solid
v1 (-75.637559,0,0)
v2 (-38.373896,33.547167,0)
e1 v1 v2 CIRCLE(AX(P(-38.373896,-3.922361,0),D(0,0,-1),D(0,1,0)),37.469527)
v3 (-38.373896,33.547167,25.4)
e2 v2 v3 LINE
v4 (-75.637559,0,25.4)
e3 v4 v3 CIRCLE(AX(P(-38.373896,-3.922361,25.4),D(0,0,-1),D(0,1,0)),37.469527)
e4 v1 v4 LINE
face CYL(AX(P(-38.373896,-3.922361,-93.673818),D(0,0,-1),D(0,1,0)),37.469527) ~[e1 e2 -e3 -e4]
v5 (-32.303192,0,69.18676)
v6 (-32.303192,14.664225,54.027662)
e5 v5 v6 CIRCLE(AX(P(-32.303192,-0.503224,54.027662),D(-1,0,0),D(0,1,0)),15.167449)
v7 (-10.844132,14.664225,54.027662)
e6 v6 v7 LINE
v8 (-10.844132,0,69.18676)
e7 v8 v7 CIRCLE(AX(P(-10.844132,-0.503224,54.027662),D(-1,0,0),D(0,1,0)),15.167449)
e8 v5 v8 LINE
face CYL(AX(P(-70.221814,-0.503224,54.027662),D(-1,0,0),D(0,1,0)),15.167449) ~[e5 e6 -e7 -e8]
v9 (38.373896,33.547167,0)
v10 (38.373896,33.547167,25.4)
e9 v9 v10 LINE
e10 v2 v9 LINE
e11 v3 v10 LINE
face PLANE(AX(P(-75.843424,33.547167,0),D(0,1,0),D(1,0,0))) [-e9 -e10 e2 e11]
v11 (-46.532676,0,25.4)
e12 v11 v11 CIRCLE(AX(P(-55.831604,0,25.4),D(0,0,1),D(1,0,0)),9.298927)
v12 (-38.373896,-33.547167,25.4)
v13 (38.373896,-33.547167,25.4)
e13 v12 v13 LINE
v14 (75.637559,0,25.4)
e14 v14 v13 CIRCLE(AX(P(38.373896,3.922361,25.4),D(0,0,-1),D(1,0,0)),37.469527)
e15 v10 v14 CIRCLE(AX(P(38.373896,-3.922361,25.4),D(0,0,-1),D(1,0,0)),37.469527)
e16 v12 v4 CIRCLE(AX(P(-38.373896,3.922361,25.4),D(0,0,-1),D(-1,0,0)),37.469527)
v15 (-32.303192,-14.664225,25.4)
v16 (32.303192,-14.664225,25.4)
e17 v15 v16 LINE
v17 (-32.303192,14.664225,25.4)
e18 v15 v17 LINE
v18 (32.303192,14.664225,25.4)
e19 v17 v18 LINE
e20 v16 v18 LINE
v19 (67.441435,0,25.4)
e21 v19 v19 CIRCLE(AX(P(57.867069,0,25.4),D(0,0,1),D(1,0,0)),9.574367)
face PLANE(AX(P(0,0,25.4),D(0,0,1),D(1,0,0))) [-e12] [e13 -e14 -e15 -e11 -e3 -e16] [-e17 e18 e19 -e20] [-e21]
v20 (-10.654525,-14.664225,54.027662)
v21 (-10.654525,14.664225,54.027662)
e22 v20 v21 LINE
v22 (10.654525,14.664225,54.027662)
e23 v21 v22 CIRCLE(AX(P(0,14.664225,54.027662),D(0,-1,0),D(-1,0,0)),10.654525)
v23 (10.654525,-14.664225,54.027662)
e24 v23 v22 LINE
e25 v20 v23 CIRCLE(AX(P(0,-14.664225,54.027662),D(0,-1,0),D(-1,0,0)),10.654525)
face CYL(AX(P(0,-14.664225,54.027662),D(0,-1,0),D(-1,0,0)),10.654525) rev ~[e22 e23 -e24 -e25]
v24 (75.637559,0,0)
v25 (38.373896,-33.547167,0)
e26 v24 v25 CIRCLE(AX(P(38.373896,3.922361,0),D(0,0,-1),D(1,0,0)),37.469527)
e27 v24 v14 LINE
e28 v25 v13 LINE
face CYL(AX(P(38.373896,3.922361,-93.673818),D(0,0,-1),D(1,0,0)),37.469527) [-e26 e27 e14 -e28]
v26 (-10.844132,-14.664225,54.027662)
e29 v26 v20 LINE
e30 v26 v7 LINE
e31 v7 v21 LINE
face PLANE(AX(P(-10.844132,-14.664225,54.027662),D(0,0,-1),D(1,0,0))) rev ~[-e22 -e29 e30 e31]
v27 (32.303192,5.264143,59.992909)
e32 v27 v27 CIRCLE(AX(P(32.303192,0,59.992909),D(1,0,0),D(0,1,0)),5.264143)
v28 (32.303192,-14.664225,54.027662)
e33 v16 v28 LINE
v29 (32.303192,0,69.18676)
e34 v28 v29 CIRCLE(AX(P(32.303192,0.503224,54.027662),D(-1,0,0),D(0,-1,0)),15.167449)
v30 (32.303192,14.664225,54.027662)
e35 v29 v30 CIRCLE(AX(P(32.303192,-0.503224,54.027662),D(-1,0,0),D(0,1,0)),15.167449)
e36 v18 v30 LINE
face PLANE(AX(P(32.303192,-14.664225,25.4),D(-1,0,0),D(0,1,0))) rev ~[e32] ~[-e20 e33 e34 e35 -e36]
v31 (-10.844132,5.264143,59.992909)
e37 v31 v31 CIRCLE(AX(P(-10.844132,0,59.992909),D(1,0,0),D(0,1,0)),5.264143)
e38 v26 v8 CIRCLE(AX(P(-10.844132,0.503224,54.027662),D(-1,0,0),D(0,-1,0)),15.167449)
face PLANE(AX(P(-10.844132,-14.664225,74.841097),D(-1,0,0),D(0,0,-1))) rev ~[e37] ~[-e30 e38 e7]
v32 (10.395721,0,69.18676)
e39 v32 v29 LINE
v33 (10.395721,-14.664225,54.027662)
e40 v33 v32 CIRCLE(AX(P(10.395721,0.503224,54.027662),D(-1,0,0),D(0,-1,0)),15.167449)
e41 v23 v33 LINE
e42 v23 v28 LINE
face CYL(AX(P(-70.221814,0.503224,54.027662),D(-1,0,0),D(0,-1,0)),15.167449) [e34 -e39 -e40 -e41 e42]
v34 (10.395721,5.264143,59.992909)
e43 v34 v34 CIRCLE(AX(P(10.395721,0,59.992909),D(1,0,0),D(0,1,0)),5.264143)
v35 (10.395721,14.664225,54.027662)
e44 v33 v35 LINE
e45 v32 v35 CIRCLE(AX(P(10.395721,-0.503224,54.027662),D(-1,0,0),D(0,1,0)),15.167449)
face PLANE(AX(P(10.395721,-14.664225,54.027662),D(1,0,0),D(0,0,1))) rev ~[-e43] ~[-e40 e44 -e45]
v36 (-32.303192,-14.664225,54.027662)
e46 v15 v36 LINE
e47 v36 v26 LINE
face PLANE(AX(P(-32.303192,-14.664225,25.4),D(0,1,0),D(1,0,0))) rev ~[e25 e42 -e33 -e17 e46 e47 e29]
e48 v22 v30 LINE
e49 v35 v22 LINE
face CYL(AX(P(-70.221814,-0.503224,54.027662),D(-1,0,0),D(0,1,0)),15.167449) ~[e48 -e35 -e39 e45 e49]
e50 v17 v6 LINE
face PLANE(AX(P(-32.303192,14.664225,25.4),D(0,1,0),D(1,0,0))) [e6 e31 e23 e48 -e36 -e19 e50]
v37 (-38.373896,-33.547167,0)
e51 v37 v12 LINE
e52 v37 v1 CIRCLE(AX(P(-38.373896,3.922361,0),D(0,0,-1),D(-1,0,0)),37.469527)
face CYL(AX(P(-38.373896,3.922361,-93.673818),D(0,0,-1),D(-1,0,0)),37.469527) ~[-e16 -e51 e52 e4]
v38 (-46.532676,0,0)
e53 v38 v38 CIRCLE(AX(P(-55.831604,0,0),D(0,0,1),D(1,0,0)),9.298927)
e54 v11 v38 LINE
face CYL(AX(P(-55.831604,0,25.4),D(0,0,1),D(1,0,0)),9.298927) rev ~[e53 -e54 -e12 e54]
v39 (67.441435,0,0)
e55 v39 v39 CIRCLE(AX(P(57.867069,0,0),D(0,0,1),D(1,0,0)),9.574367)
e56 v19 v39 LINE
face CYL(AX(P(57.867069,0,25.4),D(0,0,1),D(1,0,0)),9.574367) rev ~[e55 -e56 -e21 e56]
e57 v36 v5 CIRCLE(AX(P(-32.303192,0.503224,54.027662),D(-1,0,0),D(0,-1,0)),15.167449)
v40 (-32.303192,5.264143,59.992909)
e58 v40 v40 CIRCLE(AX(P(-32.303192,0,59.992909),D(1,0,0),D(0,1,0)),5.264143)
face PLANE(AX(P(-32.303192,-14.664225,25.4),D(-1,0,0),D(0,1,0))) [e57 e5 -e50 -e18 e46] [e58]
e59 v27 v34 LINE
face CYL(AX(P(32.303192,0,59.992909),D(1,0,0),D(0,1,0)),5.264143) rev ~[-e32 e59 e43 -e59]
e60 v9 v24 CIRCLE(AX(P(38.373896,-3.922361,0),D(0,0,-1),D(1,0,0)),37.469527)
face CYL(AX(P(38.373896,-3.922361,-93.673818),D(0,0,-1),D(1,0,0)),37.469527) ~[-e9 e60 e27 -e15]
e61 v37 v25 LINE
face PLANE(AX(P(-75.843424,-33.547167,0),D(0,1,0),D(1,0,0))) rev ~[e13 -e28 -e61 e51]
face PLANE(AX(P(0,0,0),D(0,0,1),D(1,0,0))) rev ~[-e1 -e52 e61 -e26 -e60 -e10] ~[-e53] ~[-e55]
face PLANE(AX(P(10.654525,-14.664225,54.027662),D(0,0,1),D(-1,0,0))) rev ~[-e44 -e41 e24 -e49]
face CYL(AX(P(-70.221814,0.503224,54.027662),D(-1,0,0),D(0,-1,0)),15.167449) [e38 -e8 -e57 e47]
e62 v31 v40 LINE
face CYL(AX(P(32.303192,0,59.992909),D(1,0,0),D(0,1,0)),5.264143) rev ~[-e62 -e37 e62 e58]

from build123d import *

# Parameters (mm, degrees)
F0_W         = 151.6868472099
F0_H         = 67.0943334699
F1_DEPTH     = 25.4
F9_T1_DEPTH  = 212.7476366747
F2_R         = 9.5743665409
F2_R_2       = 9.2989273841
F3_DEPTH     = 25.401
F4_W         = 64.6063834429
F4_H         = 29.3284505606
F10_DEPTH    = 43.7951106578
F11_T1_DEPTH = 140.443628516
F5_R         = 5.2641428602
F6_DEPTH     = 107.9417508016
F8_DEPTH     = 48.2123920152


# Not quite as in the source:
# - a fillet or chamfer that OpenCascade refuses, or shapes differently, is made with other operations: its cross-section is extruded or revolved along the edge and cut away or added


with BuildPart() as f1:
    # F0 (on Top) → F1 (new body)
    with BuildSketch(Plane.XY):
        Rectangle(F0_W, F0_H)
    extrude(amount=F1_DEPTH)

    # F9: fillet of radius 37.4695273349 on 4 edges, made by hand

    # F9_s2 → F9_t1 (cut)
    with BuildSketch(Plane.XY.offset(-93.6738183373)):
        with BuildLine():
            ThreePointArc((75.843423605, -3.9223606), (64.8688531364, 22.5725962664), (38.37389627, 33.5471667349))
            Line((38.37389627, 33.5471667349), (75.843423605, 33.5471667349))
            Line((75.843423605, 33.5471667349), (75.843423605, -3.9223606))
        make_face()
        with BuildLine():
            ThreePointArc((75.843423605, 3.9223606), (64.8688531364, -22.5725962664), (38.37389627, -33.5471667349))
            Line((38.37389627, -33.5471667349), (75.843423605, -33.5471667349))
            Line((75.843423605, -33.5471667349), (75.843423605, 3.9223606))
        make_face()
        with BuildLine():
            ThreePointArc((-75.843423605, 3.9223606), (-64.8688531364, -22.5725962664), (-38.37389627, -33.5471667349))
            Line((-38.37389627, -33.5471667349), (-75.843423605, -33.5471667349))
            Line((-75.843423605, -33.5471667349), (-75.843423605, 3.9223606))
        make_face()
        with BuildLine():
            ThreePointArc((-38.37389627, 33.5471667349), (-64.8688531364, 22.5725962664), (-75.843423605, -3.9223606))
            Line((-75.843423605, -3.9223606), (-75.843423605, 33.5471667349))
            Line((-75.843423605, 33.5471667349), (-38.37389627, 33.5471667349))
        make_face()
    extrude(amount=F9_T1_DEPTH, mode=Mode.SUBTRACT)

    # F2 (on face) → F3 (cut, through all)
    with BuildSketch(Plane.XY.offset(25.4)):
        with Locations((57.8670687973, 0)):
            Circle(F2_R)
        with Locations((-55.8316037059, 0)):
            Circle(F2_R_2)
    extrude(amount=-F3_DEPTH, mode=Mode.SUBTRACT)

    # F4 (on face) → F10 (join)
    with BuildSketch(Plane.XY.offset(25.4)):
        Rectangle(F4_W, F4_H)
    extrude(amount=F10_DEPTH)

    # F11: fillet of radius 15.1674490146 on 2 edges, made by hand

    # F11_s2 → F11_t1 (cut)
    with BuildSketch(Plane.YZ.offset(-70.221814258)):
        with BuildLine():
            ThreePointArc((-14.6642252803, 54.0276616432), (-10.2217823172, 64.7526676947), (0.5032237343, 69.1951106578))
            Line((0.5032237343, 69.1951106578), (-14.6642252803, 69.1951106578))
            Line((-14.6642252803, 69.1951106578), (-14.6642252803, 54.0276616432))
        make_face()
        with BuildLine():
            ThreePointArc((14.6642252803, 54.0276616432), (10.2217823172, 64.7526676947), (-0.5032237343, 69.1951106578))
            Line((-0.5032237343, 69.1951106578), (14.6642252803, 69.1951106578))
            Line((14.6642252803, 69.1951106578), (14.6642252803, 54.0276616432))
        make_face()
    extrude(amount=F11_T1_DEPTH, mode=Mode.SUBTRACT)

    # F5 (on face) → F6 (cut, through all)
    with BuildSketch(Plane.YZ.offset(32.3031917214)):
        with Locations((0, 59.9929094315)):
            Circle(F5_R)
    extrude(amount=-F6_DEPTH, mode=Mode.SUBTRACT)

    # F7 (on face) → F8 (cut, through all)
    with BuildSketch(Plane.XZ.offset(14.6642252803)):
        with BuildLine():
            Line((-10.8441319317, 74.8410969973), (-10.8441319317, 54.0276616432))
            Line((-10.8441319317, 54.0276616432), (-10.6545253, 54.0276616432))
            ThreePointArc((-10.6545253, 54.0276616432), (-1.1741893399, 64.6172881126), (10.3957206011, 56.3617358819))
            Line((10.3957206011, 56.3617358819), (10.3957206011, 74.8410969973))
            Line((10.3957206011, 74.8410969973), (-10.8441319317, 74.8410969973))
        make_face()
        with BuildLine():
            ThreePointArc((10.3957206011, 56.3617358819), (-1.1741893399, 64.6172881126), (-10.6545253, 54.0276616432))
            Line((-10.6545253, 54.0276616432), (10.3957206011, 54.0276616432))
            Line((10.3957206011, 54.0276616432), (10.3957206011, 56.3617358819))
        make_face()
        with BuildLine():
            Line((10.3957206011, 54.0276616432), (-10.6545253, 54.0276616432))
            ThreePointArc((-10.6545253, 54.0276616432), (0, 43.3731363432), (10.6545253, 54.0276616432))
            Line((10.6545253, 54.0276616432), (10.3957206011, 54.0276616432))
        make_face()
    extrude(amount=-F8_DEPTH, mode=Mode.SUBTRACT)


solid = f1.part
